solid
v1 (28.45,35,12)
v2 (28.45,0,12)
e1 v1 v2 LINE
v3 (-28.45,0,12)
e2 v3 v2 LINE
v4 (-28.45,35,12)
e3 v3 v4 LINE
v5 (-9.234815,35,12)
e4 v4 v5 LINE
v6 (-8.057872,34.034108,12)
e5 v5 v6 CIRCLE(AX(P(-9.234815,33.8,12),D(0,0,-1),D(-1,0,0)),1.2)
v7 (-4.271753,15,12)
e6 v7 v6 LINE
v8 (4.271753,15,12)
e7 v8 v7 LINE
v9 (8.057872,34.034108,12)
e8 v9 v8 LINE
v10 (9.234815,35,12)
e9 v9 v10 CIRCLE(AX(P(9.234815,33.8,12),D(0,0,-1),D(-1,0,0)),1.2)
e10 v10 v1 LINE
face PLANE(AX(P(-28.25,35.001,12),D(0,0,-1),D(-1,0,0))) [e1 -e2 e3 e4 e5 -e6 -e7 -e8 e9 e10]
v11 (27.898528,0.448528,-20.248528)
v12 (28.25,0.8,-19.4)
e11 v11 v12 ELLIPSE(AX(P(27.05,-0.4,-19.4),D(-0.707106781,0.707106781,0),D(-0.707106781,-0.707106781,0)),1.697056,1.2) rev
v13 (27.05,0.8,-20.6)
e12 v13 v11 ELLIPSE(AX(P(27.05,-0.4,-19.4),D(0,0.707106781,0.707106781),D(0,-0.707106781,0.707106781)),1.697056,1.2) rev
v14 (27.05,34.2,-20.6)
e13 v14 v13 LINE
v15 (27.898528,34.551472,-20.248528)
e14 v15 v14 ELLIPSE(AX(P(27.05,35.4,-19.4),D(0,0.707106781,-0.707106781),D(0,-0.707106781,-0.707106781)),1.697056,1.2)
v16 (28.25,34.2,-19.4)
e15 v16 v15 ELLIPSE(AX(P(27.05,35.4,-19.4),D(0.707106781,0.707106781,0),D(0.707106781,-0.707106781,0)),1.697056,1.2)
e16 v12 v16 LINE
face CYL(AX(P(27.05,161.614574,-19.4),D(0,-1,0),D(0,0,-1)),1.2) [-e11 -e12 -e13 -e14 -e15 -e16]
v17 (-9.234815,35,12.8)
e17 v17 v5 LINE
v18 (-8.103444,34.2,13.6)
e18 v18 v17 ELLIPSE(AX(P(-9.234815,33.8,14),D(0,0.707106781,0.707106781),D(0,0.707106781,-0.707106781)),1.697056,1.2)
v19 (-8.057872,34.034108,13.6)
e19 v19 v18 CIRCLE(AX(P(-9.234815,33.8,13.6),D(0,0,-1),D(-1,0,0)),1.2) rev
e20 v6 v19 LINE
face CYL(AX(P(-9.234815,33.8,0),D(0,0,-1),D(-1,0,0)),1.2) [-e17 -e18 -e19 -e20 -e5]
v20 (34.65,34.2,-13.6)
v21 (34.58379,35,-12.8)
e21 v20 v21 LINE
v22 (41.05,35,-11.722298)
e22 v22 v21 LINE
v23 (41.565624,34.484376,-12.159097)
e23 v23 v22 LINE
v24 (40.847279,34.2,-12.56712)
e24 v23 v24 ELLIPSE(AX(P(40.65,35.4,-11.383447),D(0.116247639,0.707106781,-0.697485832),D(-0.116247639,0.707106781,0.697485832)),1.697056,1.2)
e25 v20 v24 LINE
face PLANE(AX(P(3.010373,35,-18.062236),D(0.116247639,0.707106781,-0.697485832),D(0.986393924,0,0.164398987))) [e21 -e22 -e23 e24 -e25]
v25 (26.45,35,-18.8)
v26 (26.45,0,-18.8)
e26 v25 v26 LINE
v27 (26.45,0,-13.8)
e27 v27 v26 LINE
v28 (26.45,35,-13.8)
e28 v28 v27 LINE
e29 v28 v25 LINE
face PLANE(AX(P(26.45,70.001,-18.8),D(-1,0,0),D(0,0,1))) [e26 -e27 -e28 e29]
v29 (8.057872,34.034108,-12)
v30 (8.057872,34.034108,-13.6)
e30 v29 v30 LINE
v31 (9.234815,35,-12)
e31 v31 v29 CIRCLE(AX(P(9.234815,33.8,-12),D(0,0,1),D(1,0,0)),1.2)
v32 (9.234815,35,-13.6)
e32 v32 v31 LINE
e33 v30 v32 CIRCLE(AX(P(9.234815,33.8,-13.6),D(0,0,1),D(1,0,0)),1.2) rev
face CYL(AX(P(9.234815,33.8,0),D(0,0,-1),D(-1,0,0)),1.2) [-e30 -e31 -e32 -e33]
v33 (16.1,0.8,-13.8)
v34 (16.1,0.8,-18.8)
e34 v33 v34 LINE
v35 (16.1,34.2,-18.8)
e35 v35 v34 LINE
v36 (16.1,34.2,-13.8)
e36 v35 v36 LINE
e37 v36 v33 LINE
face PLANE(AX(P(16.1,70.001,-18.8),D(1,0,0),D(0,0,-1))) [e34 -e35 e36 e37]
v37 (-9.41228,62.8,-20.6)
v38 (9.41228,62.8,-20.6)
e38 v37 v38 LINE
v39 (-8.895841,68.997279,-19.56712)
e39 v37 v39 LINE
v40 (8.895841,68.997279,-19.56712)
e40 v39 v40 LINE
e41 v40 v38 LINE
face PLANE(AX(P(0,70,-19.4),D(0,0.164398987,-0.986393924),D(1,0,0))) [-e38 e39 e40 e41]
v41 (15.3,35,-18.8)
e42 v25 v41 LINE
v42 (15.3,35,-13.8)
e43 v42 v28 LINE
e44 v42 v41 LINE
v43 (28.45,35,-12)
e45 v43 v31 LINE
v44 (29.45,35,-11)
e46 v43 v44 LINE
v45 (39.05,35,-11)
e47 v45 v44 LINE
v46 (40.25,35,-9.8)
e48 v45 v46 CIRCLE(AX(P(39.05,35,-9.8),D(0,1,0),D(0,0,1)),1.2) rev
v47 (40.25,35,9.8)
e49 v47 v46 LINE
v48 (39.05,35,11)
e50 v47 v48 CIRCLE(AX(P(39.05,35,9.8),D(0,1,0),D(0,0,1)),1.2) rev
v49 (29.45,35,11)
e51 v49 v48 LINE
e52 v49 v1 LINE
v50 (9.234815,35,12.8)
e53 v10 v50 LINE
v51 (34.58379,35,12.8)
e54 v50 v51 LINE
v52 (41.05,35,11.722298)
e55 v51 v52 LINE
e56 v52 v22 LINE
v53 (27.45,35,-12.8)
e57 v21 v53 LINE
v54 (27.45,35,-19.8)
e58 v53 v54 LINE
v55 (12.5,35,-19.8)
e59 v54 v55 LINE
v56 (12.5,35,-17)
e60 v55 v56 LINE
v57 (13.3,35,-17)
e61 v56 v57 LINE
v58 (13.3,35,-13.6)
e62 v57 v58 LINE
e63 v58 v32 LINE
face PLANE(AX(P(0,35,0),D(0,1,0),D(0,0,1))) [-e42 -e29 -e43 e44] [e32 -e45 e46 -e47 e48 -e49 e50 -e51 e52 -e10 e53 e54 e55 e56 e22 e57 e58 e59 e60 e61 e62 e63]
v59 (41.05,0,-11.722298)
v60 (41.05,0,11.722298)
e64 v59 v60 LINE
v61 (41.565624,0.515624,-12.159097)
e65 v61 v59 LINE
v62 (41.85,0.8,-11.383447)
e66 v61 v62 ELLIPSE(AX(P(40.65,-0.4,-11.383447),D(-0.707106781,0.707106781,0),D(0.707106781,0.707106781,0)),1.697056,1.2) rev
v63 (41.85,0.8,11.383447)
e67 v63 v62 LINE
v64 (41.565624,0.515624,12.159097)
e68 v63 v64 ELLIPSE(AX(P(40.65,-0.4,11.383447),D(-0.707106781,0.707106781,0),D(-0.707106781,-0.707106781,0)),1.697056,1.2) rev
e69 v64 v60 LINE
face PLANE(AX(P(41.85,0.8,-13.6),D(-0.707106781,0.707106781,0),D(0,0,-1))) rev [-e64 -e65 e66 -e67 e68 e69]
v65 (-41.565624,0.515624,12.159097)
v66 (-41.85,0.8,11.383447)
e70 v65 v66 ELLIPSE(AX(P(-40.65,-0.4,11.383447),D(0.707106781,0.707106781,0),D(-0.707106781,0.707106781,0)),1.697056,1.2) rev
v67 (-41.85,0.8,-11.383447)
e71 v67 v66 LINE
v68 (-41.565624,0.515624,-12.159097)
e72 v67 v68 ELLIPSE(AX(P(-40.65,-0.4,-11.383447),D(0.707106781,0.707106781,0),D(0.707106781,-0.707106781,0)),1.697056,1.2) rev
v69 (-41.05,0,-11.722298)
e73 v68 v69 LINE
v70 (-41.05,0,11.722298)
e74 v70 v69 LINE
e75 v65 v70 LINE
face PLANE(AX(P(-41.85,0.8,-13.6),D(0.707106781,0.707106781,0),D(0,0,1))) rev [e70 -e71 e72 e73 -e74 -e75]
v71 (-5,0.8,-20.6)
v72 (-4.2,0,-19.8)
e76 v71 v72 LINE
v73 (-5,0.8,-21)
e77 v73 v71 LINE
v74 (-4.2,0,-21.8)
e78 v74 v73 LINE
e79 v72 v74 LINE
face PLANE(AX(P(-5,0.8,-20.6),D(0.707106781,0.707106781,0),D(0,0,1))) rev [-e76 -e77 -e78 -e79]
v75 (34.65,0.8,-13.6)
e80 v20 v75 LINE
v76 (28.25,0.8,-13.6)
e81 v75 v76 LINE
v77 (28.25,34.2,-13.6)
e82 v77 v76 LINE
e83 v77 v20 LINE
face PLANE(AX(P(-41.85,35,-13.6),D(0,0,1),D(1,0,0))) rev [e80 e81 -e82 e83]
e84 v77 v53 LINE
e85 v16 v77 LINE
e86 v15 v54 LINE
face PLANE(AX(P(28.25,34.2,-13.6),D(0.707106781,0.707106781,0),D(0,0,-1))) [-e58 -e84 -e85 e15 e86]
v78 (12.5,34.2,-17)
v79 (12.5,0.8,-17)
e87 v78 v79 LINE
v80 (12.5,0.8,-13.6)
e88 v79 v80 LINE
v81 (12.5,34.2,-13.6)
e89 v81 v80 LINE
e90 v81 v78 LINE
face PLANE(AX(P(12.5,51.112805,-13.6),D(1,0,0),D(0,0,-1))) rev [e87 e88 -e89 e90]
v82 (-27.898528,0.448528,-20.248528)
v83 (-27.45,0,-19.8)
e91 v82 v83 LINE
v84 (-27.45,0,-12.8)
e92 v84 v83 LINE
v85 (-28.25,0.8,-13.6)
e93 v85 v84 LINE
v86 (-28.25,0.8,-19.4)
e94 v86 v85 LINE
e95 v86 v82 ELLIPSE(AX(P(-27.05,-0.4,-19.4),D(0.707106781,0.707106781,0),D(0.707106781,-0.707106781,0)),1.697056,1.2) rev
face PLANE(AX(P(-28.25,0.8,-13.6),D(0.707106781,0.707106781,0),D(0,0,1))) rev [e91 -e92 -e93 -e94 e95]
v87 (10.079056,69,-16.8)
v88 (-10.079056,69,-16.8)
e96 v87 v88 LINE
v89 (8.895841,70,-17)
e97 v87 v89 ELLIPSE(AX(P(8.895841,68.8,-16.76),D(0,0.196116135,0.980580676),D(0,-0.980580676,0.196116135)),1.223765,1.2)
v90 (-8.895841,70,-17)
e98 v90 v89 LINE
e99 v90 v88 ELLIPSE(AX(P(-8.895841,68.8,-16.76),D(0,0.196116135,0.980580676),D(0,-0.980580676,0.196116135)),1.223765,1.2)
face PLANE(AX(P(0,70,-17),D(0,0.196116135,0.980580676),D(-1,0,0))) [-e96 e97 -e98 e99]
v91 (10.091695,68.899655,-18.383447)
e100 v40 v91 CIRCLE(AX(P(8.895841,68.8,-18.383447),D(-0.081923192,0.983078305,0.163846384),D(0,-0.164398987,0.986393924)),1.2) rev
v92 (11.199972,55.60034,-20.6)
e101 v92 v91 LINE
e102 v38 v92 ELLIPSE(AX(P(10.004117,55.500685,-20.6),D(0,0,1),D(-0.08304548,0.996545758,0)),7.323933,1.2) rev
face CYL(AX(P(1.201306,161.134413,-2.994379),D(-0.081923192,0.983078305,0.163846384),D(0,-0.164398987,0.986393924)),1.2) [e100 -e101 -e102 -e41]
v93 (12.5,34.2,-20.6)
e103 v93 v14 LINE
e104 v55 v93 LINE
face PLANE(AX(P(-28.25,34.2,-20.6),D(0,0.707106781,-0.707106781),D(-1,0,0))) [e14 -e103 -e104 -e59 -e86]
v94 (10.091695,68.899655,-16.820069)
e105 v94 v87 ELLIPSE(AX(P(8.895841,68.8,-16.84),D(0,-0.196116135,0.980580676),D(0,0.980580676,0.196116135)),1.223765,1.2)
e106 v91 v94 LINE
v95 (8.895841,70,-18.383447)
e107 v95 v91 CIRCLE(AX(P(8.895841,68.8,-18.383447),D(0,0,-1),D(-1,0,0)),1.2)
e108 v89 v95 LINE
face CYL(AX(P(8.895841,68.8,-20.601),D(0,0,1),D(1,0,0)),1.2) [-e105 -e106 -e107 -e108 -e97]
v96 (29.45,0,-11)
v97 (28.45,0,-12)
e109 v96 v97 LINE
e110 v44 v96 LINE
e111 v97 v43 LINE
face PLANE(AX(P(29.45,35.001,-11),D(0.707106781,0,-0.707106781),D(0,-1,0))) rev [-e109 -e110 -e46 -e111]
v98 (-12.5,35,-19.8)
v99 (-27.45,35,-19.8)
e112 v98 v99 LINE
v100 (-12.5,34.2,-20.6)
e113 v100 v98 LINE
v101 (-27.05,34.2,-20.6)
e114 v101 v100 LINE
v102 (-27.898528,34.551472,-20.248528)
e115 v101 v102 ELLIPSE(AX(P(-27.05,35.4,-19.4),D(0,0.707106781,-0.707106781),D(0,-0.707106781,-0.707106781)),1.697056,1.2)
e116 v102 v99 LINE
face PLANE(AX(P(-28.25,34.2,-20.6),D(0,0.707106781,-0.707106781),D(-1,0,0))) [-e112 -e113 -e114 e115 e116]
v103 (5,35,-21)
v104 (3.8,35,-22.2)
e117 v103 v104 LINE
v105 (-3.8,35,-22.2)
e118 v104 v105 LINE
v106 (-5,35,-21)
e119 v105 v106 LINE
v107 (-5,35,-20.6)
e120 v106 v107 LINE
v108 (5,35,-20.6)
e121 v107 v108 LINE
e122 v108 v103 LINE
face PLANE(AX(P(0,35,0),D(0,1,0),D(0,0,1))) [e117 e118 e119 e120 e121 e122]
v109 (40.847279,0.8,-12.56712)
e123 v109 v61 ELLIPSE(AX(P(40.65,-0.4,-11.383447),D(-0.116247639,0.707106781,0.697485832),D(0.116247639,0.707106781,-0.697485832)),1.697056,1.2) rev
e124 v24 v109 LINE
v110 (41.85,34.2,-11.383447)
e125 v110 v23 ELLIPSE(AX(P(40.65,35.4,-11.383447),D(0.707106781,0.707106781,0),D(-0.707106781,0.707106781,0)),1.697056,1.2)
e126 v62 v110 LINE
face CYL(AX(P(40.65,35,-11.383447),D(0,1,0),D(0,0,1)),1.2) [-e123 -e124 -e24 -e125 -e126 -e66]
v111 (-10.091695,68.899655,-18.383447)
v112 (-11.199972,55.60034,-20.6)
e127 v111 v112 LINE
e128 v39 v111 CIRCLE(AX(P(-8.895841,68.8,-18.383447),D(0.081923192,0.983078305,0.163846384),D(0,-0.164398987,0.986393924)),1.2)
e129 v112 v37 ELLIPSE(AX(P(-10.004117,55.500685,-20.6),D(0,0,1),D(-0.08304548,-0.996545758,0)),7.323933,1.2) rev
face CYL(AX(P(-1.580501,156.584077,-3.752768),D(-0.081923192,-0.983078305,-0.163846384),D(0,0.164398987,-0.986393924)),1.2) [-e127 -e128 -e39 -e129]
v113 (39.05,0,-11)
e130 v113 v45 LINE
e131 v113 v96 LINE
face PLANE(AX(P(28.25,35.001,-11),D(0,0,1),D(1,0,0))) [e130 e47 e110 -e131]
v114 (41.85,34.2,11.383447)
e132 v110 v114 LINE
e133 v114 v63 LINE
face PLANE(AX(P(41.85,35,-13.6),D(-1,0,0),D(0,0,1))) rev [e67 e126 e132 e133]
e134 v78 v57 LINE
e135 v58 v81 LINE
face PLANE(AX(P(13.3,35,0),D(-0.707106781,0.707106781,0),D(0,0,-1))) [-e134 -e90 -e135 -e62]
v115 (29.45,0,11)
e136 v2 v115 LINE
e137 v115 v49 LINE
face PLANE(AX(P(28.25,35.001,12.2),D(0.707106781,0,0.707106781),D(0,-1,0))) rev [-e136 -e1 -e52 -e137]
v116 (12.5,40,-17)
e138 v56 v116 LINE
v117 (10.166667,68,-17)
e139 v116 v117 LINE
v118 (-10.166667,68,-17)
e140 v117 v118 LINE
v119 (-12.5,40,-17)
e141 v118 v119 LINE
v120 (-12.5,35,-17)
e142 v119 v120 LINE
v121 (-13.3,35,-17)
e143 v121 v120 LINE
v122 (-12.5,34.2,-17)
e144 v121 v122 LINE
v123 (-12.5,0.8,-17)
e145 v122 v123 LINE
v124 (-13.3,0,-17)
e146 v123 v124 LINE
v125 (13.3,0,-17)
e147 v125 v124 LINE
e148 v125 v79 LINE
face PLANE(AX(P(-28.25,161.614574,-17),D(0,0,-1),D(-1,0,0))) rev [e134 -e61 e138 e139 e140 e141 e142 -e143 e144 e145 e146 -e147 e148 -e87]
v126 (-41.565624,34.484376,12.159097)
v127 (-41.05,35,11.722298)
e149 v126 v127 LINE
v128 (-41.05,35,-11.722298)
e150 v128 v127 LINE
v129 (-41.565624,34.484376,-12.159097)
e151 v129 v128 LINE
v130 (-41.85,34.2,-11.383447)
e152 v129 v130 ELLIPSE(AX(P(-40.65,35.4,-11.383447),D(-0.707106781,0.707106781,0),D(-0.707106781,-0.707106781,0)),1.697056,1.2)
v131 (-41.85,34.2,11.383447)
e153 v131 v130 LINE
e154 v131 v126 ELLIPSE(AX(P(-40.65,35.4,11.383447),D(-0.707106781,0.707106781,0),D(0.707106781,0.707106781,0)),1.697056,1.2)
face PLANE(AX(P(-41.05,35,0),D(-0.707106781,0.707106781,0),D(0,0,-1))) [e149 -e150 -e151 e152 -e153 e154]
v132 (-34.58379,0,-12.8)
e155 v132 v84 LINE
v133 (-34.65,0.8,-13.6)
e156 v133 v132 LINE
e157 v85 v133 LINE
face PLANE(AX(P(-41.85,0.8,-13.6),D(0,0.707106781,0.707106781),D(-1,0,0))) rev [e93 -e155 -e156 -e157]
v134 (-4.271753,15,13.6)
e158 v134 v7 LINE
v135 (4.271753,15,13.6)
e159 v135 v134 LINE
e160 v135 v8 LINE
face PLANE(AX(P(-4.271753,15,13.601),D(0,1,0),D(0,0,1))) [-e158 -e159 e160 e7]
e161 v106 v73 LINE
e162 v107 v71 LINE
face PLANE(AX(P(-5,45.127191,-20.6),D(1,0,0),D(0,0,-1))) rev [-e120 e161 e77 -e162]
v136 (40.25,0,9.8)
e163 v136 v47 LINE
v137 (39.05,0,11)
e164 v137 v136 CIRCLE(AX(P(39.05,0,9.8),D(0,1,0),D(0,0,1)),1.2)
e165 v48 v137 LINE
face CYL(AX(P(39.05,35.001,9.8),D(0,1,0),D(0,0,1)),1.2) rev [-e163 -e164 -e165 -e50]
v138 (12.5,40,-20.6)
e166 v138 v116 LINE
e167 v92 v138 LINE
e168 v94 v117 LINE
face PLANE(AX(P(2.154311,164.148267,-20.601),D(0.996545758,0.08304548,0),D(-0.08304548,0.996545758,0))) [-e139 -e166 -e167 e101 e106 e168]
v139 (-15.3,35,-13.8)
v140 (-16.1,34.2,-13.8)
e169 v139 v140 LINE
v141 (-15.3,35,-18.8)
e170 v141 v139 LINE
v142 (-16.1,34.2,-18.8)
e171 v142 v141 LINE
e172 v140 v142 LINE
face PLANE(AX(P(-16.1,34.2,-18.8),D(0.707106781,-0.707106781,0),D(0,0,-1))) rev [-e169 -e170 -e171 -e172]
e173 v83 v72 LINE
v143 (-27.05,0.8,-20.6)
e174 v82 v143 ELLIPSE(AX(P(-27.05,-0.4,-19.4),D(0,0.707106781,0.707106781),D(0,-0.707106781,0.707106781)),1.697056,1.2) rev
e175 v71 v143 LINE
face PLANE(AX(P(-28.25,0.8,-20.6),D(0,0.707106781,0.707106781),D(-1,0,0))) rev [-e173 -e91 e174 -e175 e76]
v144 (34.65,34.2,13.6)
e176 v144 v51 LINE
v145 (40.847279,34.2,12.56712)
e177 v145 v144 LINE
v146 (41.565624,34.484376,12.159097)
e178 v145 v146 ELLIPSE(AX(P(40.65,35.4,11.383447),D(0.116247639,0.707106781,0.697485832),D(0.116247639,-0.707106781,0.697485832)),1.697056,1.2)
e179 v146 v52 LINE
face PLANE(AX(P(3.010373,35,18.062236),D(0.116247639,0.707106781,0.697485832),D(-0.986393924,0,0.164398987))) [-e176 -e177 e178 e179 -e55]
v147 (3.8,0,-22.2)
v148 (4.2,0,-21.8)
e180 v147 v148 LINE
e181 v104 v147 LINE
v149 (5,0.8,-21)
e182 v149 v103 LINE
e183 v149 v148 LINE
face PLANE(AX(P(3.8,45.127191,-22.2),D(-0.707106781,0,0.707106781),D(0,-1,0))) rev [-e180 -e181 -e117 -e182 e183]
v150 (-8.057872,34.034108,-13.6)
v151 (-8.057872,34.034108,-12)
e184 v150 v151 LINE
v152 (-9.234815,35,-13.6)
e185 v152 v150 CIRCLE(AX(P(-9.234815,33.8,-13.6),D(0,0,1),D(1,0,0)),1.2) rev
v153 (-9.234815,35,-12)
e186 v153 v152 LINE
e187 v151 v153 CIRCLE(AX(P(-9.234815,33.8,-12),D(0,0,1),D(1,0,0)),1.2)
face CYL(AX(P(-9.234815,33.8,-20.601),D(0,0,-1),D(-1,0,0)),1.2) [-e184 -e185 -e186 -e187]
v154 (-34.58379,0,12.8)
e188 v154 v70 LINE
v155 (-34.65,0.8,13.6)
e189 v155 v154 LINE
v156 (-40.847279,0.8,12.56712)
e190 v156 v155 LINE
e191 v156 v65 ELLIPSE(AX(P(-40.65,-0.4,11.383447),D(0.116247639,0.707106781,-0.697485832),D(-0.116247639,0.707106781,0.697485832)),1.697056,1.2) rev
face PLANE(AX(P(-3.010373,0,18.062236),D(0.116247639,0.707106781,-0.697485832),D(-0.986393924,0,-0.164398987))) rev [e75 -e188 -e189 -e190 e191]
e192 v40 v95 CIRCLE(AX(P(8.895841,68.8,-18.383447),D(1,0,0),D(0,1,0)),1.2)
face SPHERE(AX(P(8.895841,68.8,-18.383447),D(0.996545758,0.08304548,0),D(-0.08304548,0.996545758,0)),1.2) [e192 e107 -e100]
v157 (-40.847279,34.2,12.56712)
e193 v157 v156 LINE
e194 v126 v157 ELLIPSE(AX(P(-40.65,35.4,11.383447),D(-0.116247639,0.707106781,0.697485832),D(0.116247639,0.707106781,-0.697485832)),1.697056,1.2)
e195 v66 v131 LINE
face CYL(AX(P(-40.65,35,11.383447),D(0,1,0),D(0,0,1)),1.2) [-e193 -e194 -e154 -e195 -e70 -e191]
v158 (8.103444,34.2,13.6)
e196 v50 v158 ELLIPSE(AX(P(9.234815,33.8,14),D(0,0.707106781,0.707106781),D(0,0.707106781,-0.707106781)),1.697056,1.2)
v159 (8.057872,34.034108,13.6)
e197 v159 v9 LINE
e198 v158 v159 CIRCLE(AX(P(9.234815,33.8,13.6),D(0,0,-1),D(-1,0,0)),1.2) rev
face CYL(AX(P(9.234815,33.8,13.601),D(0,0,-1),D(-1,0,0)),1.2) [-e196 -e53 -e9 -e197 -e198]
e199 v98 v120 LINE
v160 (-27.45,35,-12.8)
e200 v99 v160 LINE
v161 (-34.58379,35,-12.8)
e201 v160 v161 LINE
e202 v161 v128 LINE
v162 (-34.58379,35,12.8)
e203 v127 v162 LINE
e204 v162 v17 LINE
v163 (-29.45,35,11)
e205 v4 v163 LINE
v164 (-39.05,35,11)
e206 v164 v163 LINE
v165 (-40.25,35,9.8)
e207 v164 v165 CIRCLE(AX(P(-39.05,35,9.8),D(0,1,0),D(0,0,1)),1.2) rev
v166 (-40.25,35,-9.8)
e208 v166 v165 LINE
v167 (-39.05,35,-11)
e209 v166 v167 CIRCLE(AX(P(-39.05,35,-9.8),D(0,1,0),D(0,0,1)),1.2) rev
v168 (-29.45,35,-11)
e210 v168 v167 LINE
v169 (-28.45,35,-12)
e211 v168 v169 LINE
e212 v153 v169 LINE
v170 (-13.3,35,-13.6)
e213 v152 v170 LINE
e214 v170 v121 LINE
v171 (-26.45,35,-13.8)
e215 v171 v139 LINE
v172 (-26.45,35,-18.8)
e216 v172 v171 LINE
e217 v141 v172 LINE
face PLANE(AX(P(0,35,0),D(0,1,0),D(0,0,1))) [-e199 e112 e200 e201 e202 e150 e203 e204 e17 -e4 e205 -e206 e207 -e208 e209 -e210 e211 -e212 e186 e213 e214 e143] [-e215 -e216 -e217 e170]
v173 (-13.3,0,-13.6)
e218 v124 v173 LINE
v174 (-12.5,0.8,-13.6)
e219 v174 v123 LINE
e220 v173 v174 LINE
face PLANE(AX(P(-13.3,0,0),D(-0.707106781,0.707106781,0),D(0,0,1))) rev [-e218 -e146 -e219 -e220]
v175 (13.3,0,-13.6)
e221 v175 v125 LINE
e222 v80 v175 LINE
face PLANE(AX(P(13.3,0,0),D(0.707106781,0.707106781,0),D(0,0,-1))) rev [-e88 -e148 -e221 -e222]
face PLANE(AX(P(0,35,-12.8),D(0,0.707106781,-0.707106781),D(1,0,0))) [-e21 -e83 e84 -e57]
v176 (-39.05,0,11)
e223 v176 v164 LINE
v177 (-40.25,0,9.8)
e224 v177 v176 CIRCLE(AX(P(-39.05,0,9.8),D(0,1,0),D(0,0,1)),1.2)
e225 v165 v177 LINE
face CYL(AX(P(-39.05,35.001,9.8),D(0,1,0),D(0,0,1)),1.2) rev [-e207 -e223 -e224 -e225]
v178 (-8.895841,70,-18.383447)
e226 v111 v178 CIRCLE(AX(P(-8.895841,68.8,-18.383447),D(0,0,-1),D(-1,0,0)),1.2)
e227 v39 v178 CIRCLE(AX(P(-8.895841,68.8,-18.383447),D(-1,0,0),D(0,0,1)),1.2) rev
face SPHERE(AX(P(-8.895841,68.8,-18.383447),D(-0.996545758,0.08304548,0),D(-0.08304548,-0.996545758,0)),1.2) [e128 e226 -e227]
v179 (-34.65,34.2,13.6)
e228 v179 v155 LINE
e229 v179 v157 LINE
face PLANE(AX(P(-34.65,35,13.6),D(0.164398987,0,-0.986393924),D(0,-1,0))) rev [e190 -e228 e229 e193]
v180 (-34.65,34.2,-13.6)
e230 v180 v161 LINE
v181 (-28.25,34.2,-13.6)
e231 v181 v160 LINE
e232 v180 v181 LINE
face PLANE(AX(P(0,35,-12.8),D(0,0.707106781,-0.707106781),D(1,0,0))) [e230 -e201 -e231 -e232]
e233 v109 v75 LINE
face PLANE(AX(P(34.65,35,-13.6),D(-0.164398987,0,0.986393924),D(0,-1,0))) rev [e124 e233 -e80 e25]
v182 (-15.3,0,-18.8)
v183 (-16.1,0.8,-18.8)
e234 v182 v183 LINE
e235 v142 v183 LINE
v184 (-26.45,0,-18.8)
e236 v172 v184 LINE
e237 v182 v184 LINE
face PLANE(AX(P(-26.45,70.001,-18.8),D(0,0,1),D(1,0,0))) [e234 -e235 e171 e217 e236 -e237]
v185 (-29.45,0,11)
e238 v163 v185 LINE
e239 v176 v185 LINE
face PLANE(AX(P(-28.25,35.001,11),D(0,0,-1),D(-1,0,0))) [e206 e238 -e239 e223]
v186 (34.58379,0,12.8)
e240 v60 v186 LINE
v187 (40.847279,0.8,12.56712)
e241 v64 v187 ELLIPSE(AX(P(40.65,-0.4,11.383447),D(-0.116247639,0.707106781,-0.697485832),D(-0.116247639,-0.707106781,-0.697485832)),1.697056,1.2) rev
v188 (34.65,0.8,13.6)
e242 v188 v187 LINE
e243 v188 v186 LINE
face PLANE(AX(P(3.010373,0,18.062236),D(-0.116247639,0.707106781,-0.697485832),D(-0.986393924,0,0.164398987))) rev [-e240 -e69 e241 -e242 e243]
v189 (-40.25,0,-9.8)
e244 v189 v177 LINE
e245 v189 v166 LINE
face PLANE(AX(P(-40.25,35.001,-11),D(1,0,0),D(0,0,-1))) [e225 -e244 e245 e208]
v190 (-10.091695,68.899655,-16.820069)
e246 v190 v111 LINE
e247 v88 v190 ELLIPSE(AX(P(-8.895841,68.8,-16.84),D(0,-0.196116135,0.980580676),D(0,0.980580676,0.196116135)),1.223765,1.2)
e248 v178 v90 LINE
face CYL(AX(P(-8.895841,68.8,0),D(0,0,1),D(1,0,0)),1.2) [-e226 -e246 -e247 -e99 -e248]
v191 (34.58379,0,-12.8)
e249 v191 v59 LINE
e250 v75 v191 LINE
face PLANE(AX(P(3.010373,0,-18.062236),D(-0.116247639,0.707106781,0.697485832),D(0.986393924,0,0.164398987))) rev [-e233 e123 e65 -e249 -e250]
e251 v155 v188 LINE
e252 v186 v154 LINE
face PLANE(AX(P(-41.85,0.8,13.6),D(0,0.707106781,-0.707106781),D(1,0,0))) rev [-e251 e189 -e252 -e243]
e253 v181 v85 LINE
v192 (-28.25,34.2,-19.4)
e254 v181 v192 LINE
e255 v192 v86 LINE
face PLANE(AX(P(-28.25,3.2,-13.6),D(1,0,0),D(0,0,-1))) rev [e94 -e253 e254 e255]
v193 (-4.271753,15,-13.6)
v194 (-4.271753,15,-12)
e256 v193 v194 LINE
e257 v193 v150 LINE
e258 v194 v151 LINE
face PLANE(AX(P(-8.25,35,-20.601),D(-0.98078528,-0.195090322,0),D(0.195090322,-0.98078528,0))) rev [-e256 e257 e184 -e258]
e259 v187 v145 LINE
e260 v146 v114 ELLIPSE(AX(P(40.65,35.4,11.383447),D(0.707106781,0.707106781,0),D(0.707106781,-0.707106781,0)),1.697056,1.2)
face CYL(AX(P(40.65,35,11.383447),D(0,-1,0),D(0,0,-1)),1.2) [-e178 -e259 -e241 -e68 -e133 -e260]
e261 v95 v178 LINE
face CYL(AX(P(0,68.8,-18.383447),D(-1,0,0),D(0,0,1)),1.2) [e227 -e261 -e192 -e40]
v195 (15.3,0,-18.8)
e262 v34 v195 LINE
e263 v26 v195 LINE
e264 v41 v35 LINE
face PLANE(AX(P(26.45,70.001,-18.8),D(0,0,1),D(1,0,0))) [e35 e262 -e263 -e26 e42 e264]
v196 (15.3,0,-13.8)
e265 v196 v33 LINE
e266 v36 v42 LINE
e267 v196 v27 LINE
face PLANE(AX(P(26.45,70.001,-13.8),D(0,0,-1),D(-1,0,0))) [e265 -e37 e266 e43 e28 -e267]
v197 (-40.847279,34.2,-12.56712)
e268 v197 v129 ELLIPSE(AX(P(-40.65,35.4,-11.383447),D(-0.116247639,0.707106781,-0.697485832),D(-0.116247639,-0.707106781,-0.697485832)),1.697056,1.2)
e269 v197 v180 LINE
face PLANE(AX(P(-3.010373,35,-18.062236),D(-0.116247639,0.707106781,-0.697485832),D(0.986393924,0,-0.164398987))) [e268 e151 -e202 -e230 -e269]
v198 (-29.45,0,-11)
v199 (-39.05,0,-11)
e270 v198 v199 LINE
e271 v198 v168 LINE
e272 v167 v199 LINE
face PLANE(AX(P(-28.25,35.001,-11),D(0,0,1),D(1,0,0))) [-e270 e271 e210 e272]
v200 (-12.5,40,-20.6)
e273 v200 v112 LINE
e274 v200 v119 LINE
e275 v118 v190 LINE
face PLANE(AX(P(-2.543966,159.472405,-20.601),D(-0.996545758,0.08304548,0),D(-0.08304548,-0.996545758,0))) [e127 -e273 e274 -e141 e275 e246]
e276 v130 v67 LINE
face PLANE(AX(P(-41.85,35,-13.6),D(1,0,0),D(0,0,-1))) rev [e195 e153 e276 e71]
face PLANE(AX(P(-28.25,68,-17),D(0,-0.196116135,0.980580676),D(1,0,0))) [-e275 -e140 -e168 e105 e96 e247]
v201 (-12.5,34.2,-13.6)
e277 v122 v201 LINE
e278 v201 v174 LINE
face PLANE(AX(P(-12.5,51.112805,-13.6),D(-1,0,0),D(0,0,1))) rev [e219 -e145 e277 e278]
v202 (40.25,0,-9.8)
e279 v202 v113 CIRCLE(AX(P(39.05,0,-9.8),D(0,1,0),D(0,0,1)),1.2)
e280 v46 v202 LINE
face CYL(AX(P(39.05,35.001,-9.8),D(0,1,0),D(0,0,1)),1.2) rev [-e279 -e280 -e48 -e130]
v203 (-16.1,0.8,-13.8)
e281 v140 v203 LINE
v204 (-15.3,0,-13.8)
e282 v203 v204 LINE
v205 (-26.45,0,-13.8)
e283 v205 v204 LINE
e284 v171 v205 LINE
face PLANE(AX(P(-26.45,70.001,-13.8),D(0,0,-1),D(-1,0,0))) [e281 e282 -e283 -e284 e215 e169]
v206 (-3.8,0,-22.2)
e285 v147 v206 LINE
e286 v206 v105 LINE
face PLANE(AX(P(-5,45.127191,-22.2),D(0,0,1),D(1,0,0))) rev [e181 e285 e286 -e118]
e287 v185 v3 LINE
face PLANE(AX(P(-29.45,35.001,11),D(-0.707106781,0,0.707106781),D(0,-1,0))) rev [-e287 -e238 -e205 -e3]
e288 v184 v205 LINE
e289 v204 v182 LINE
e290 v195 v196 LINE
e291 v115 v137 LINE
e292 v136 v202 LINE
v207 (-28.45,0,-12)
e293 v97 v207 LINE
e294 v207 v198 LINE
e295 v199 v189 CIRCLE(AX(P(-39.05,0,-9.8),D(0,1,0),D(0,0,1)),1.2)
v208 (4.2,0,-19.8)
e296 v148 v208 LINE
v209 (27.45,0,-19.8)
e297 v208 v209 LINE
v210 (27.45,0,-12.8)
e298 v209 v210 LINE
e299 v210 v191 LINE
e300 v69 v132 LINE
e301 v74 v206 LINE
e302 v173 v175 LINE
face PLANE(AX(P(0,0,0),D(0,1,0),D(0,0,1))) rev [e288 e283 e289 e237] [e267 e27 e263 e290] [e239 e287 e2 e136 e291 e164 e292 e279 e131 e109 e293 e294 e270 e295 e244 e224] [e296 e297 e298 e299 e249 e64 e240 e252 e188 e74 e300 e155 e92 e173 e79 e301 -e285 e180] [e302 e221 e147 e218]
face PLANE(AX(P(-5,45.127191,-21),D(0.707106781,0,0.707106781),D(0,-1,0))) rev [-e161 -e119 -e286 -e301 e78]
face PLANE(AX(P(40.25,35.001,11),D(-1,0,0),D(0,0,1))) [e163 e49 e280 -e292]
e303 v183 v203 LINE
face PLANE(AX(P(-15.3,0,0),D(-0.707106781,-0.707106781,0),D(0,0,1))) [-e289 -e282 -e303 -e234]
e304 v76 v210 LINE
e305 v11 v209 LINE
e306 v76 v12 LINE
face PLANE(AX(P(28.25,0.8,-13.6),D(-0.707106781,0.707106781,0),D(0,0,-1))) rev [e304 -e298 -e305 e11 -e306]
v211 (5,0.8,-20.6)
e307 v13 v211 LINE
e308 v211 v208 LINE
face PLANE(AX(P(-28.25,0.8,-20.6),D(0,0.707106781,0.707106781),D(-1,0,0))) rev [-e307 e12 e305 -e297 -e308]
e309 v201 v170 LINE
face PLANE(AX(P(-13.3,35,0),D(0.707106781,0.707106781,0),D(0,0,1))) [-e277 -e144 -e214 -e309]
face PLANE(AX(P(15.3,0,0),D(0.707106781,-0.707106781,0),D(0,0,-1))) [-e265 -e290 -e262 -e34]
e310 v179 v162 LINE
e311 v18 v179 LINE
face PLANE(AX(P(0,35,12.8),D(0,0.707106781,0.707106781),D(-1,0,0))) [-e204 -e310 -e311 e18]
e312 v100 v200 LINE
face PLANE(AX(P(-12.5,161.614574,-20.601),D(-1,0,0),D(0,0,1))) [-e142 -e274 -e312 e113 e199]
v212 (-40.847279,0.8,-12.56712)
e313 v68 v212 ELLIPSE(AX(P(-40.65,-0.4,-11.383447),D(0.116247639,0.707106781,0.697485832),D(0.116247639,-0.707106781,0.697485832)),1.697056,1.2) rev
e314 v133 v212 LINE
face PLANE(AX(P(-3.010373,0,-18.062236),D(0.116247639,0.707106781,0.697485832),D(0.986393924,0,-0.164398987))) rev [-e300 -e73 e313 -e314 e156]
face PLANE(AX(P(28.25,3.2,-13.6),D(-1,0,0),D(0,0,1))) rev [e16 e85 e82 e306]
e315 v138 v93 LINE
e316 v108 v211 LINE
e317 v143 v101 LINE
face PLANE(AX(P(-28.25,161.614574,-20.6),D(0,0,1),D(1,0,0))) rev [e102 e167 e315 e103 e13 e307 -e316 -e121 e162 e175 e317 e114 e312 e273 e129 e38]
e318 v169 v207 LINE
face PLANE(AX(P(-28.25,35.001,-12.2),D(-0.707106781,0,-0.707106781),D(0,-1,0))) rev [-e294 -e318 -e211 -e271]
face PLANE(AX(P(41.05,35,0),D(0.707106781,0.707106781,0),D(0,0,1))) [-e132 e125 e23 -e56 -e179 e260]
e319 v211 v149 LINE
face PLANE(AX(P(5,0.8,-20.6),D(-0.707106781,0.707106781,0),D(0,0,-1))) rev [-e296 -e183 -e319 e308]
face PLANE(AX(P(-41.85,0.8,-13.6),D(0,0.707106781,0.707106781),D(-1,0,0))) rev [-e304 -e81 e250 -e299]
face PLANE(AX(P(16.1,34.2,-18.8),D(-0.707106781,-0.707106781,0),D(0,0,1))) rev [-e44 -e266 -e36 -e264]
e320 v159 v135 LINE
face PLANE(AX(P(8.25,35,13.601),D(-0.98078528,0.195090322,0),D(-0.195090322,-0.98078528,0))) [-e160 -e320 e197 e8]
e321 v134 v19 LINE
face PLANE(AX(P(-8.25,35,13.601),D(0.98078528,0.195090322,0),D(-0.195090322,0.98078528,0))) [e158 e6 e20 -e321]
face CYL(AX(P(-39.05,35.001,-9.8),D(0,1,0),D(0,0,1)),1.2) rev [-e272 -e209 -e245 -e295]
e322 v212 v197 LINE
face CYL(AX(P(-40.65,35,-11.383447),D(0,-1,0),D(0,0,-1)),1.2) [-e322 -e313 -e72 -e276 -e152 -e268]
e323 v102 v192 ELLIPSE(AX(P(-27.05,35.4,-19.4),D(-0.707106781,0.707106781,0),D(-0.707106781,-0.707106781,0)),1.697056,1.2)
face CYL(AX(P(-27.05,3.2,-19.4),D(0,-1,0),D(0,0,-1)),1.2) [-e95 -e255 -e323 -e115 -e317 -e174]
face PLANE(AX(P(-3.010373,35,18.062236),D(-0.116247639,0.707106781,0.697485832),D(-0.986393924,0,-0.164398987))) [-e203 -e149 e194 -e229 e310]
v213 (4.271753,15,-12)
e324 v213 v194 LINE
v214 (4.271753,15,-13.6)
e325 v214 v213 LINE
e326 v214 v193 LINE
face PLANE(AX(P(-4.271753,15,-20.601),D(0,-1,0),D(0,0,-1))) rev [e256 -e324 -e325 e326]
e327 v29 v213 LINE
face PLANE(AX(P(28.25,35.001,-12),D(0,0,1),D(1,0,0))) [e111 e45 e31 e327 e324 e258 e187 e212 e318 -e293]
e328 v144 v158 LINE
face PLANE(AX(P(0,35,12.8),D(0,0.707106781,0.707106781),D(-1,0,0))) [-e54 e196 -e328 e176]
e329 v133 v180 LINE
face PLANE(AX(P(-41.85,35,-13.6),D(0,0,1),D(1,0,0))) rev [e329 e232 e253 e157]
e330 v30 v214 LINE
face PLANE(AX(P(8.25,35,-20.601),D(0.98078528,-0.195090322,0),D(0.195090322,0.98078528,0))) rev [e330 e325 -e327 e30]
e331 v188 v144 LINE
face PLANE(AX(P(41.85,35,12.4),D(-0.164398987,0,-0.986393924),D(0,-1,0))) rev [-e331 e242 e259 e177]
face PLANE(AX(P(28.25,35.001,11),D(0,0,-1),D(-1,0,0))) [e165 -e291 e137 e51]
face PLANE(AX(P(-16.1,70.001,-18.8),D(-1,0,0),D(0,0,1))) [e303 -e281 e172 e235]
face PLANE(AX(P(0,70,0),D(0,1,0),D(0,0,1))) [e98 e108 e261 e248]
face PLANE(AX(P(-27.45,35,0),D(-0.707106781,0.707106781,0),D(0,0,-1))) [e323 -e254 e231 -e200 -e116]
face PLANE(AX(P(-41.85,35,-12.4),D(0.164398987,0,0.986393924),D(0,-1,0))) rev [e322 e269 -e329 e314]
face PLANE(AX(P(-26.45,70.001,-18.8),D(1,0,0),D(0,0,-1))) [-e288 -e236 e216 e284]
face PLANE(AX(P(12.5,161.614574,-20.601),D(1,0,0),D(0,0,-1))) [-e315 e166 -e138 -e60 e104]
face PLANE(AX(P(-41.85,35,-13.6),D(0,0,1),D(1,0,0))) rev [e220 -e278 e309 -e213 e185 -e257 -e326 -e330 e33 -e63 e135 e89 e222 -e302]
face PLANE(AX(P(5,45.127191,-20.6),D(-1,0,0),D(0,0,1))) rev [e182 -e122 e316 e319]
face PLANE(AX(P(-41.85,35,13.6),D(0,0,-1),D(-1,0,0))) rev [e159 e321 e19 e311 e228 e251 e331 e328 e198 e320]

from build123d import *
from OCP.BRepFilletAPI import BRepFilletAPI_MakeChamfer

# Parameters (mm, degrees)
SKETCH1_W                      = 83.7
SKETCH1_H                      = 27.2
BOSS_EXTRUDE1_DEPTH            = 35
CUT_EXTRUDE1_REACH             = 58.226
SKETCH3_W                      = 56.5
SKETCH3_H                      = 3.4
BOSS_EXTRUDE2_DEPTH            = 3.2
SKETCH4_W                      = 56.5
SKETCH4_H                      = 3.6
BOSS_EXTRUDE3_DEPTH            = 70
CUT_EXTRUDE2_START             = -20.6
SKETCH5_W                      = 15.75
SKETCH5_H                      = 35
CUT_EXTRUDE2_DEPTH             = 3.6
SKETCH6_W                      = 15.75
SKETCH6_H                      = 3.4
BOSS_EXTRUDE4_DEPTH            = 35
CUT_EXTRUDE3_REACH             = 86.118
SKETCH7_W                      = 25
SKETCH7_H                      = 3.4
CUT_EXTRUDE4_START             = -20.6
CUT_EXTRUDE4_DEPTH             = 3.6
CUT_EXTRUDE5_REACH             = 86.118
SKETCH9_W                      = 10.35
SKETCH9_H                      = 5
CUT_EXTRUDE6_REACH             = 86.118
CUT_EXTRUDE6_DIRECTION_2_REACH = 86.118
SKETCH11_W                     = 10
SKETCH11_H                     = 1.6
BOSS_EXTRUDE5_DEPTH            = 35
BOSS_EXTRUDE6_START            = -17
BOSS_EXTRUDE6_DEPTH            = 0.2
CHAMFER1_SIZE                  = 7.2
CHAMFER1_SIZE2                 = 1.2
CHAMFER2_SIZE                  = 1.2
CHAMFER2_SIZE2                 = 7.2
CHAMFER3_SIZE                  = 1.2
CHAMFER4_SIZE                  = 0.8
CHAMFER5_SIZE                  = 0.2
CHAMFER5_SIZE_2                = 1
FILLET1_R                      = 1.2


# Some blends are built 0.0001 mm under size
with BuildPart() as part:
    # Sketch1 → Boss-Extrude1 (new body)
    with BuildSketch(Plane(origin=(0, 0, 0), x_dir=(1, 0, 0), z_dir=(0, 1, 0))):
        Rectangle(SKETCH1_W, SKETCH1_H)
    extrude(amount=BOSS_EXTRUDE1_DEPTH)

    # Sketch2 → Cut-Extrude1 (cut, up to next)
    with BuildSketch(Plane(origin=(0, 0, 0), x_dir=(1, 0, 0), z_dir=(0, 1, 0)), mode=Mode.PRIVATE) as cut_extrude1_sk1:
        Polygon((-28.25, 12), (-28.25, 11), (-40.25, 11), (-40.25, -11), (-28.25, -11), (-28.25, -12), (28.25, -12), (28.25, -11), (40.25, -11), (40.25, 11), (28.25, 11), (28.25, 12), align=None)
    cut_extrude1_tool1 = extrude(cut_extrude1_sk1.sketch, amount=CUT_EXTRUDE1_REACH, mode=Mode.PRIVATE) & part.part
    add(cut_extrude1_tool1.solids().sort_by_distance((0, 0, 0))[0], mode=Mode.SUBTRACT)

    # Sketch3 → Boss-Extrude2 (add)
    with BuildSketch(Plane(origin=(0, 0, 0), x_dir=(1, 0, 0), z_dir=(0, 1, 0))):
        with Locations((0, 15.3)):
            Rectangle(SKETCH3_W, SKETCH3_H)
    extrude(amount=BOSS_EXTRUDE2_DEPTH)

    # Sketch4 → Boss-Extrude3 (add)
    with BuildSketch(Plane(origin=(0, 0, 0), x_dir=(1, 0, 0), z_dir=(0, 1, 0))):
        with Locations((0, 18.8)):
            Rectangle(SKETCH4_W, SKETCH4_H)
    extrude(amount=BOSS_EXTRUDE3_DEPTH)

    # Sketch5 → Cut-Extrude2 (cut)
    with BuildSketch(Plane.XY.offset(CUT_EXTRUDE2_START)):
        with Locations((-20.375, 52.5)):
            Rectangle(SKETCH5_W, SKETCH5_H)
        with Locations((20.375, 52.5)):
            Rectangle(SKETCH5_W, SKETCH5_H)
    extrude(amount=CUT_EXTRUDE2_DEPTH, mode=Mode.SUBTRACT)

    # Sketch6 → Boss-Extrude4 (add)
    with BuildSketch(Plane(origin=(0, 0, 0), x_dir=(1, 0, 0), z_dir=(0, 1, 0))):
        with Locations((-20.375, 15.3)):
            Rectangle(SKETCH6_W, SKETCH6_H)
        with Locations((20.375, 15.3)):
            Rectangle(SKETCH6_W, SKETCH6_H)
    extrude(amount=BOSS_EXTRUDE4_DEPTH)

    # Sketch7 → Cut-Extrude3 (cut, up to next)
    with BuildSketch(Plane(origin=(0, 0, 0), x_dir=(1, 0, 0), z_dir=(0, 1, 0)), mode=Mode.PRIVATE) as cut_extrude3_sk1:
        with Locations((0, 15.3)):
            Rectangle(SKETCH7_W, SKETCH7_H)
    cut_extrude3_tool1 = extrude(cut_extrude3_sk1.sketch, amount=CUT_EXTRUDE3_REACH, mode=Mode.PRIVATE) & part.part
    add(cut_extrude3_tool1.solids().sort_by_distance((0, 0, -15.3))[0], mode=Mode.SUBTRACT)

    # Sketch8 → Cut-Extrude4 (cut)
    with BuildSketch(Plane.XY.offset(CUT_EXTRUDE4_START)):
        Polygon((12.5, 40), (10, 70), (12.5, 70), align=None)
        Polygon((-12.5, 70), (-10, 70), (-12.5, 40), align=None)
    extrude(amount=CUT_EXTRUDE4_DEPTH, mode=Mode.SUBTRACT)

    # Sketch9 → Cut-Extrude5 (cut, up to next)
    with BuildSketch(Plane(origin=(0, 0, 0), x_dir=(1, 0, 0), z_dir=(0, 1, 0)), mode=Mode.PRIVATE) as cut_extrude5_sk1:
        with Locations((-21.275, 16.3)):
            Rectangle(SKETCH9_W, SKETCH9_H)
    cut_extrude5_tool1 = extrude(cut_extrude5_sk1.sketch, amount=CUT_EXTRUDE5_REACH, mode=Mode.PRIVATE) & part.part
    # Sketch9 → Cut-Extrude5 (cut, up to next)
    with BuildSketch(Plane(origin=(0, 0, 0), x_dir=(1, 0, 0), z_dir=(0, 1, 0)), mode=Mode.PRIVATE) as cut_extrude5_sk2:
        with Locations((21.275, 16.3)):
            Rectangle(SKETCH9_W, SKETCH9_H)
    cut_extrude5_tool2 = extrude(cut_extrude5_sk2.sketch, amount=CUT_EXTRUDE5_REACH, mode=Mode.PRIVATE) & part.part
    add(cut_extrude5_tool1.solids().sort_by_distance((-21.275, 0, -16.3))[0], mode=Mode.SUBTRACT)
    add(cut_extrude5_tool2.solids().sort_by_distance((21.275, 0, -16.3))[0], mode=Mode.SUBTRACT)

    # Sketch10 → Cut-Extrude6 (cut, up to next)
    with BuildSketch(Plane.XY, mode=Mode.PRIVATE) as cut_extrude6_sk1:
        Polygon((-8.25, 35), (8.25, 35), (4.271752652, 15), (-4.271752652, 15), align=None)
    cut_extrude6_tool1 = extrude(cut_extrude6_sk1.sketch, amount=-CUT_EXTRUDE6_REACH, mode=Mode.PRIVATE) & part.part
    add(cut_extrude6_tool1.solids().sort_by_distance((0, 26.059023, 0))[0], mode=Mode.SUBTRACT)

    # Sketch10 → Cut-Extrude6 direction 2 (cut, up to next)
    with BuildSketch(Plane.XY, mode=Mode.PRIVATE) as cut_extrude6_direction_2_sk1:
        Polygon((-8.25, 35), (8.25, 35), (4.271752652, 15), (-4.271752652, 15), align=None)
    cut_extrude6_direction_2_tool1 = extrude(cut_extrude6_direction_2_sk1.sketch, amount=CUT_EXTRUDE6_DIRECTION_2_REACH, mode=Mode.PRIVATE) & part.part
    add(cut_extrude6_direction_2_tool1.solids().sort_by_distance((0, 26.059023, 0))[0], mode=Mode.SUBTRACT)

    # Sketch11 → Boss-Extrude5 (add)
    with BuildSketch(Plane(origin=(0, 0, 0), x_dir=(1, 0, 0), z_dir=(0, 1, 0))):
        with Locations((0, 21.4)):
            Rectangle(SKETCH11_W, SKETCH11_H)
    extrude(amount=BOSS_EXTRUDE5_DEPTH)

    # Sketch12 → Boss-Extrude6 (add)
    with BuildSketch(Plane.XY.offset(BOSS_EXTRUDE6_START)):
        Polygon((-10, 70), (-10.166666667, 68), (10.166666667, 68), (10, 70), align=None)
    extrude(amount=BOSS_EXTRUDE6_DEPTH)

    # Chamfer1: one chamfer whose edges measure the first distance from different faces: ONE call of the kernel's chamfer builder (chamfer() names one face for all edges)
    chamfer1_edges_1 = [part.edges().sort_by_distance(p)[0] for p in [
        (0, 70, -20.6),
    ]]
    chamfer1_side_1 = [part.faces().sort_by_distance(p)[0] for p in [
        (16.625, 0.899569341, -20.6),
    ]]
    chamfer1_edges_2 = [part.edges().sort_by_distance(p)[0] for p in [
        (-41.85, 17.5, -13.6),
    ]]
    chamfer1_side_2 = [part.faces().sort_by_distance(p)[0] for p in [
        (-35.05, 17.5, -13.6),
    ]]
    chamfer1_edges_3 = [part.edges().sort_by_distance(p)[0] for p in [
        (41.85, 17.5, 13.6),
    ]]
    chamfer1_side_3 = [part.faces().sort_by_distance(p)[0] for p in [
        (0, 0.907231503, 13.6),
    ]]
    chamfer1 = BRepFilletAPI_MakeChamfer(part.part.solid().wrapped)
    for e in chamfer1_edges_1:
        chamfer1.Add(CHAMFER1_SIZE, CHAMFER1_SIZE2, e.wrapped, chamfer1_side_1[0].wrapped)  # the first distance lies on this face
    for e in chamfer1_edges_2:
        chamfer1.Add(CHAMFER1_SIZE, CHAMFER1_SIZE2, e.wrapped, chamfer1_side_2[0].wrapped)  # the first distance lies on this face
    for e in chamfer1_edges_3:
        chamfer1.Add(CHAMFER1_SIZE, CHAMFER1_SIZE2, e.wrapped, chamfer1_side_3[0].wrapped)  # the first distance lies on this face
    add(Compound.cast(chamfer1.Shape()), mode=Mode.REPLACE)

    # Chamfer2: one chamfer whose edges measure the first distance from different faces: ONE call of the kernel's chamfer builder (chamfer() names one face for all edges)
    chamfer2_edges_1 = [part.edges().sort_by_distance(p)[0] for p in [
        (41.85, 17.5, -13.6),
    ]]
    chamfer2_side_1 = [part.faces().sort_by_distance(p)[0] for p in [
        (41.85, 17.5, -0.6),
    ]]
    chamfer2_edges_2 = [part.edges().sort_by_distance(p)[0] for p in [
        (-41.85, 17.5, 13.6),
    ]]
    chamfer2_side_2 = [part.faces().sort_by_distance(p)[0] for p in [
        (-41.85, 17.5, 0.6),
    ]]
    chamfer2 = BRepFilletAPI_MakeChamfer(part.part.solid().wrapped)
    for e in chamfer2_edges_1:
        chamfer2.Add(CHAMFER2_SIZE, CHAMFER2_SIZE2, e.wrapped, chamfer2_side_1[0].wrapped)  # the first distance lies on this face
    for e in chamfer2_edges_2:
        chamfer2.Add(CHAMFER2_SIZE, CHAMFER2_SIZE2, e.wrapped, chamfer2_side_2[0].wrapped)  # the first distance lies on this face
    add(Compound.cast(chamfer2.Shape()), mode=Mode.REPLACE)

    # Chamfer3
    # the kernel refuses this chamfer: 1.2 mm, written as the material it takes off along each edge
    with BuildSketch(Plane(origin=(28.25, -3.086019586, -11), x_dir=(0.9996219169112968, 0, 0.027495876610585904), z_dir=(0, 1, 0))) as chamfer3_piece_1_section:
        Polygon((CHAMFER3_SIZE * 0.999621916911, CHAMFER3_SIZE * 0.0274958766106), (-CHAMFER3_SIZE * 0.0274958766106, CHAMFER3_SIZE * 0.999621916911), (0, 0), align=None)
    chamfer3_piece_1 = extrude(amount=41.172039171, mode=Mode.PRIVATE)
    chamfer3_piece_1 = split(chamfer3_piece_1, bisect_by=Plane(origin=(28.660431829, 17.5, -12), z_dir=(0, 0, 1)), keep=Keep.TOP, mode=Mode.PRIVATE)
    add(chamfer3_piece_1, mode=Mode.SUBTRACT)
    with BuildSketch(Plane(origin=(28.25, -3.086019586, 11), x_dir=(-0.027495876610587378, 0, 0.9996219169112965), z_dir=(0, 1, 0))) as chamfer3_piece_2_section:
        Polygon((CHAMFER3_SIZE * 0.999621916911, CHAMFER3_SIZE * 0.0274958766106), (-CHAMFER3_SIZE * 0.0274958766106, CHAMFER3_SIZE * 0.999621916911), (0, 0), align=None)
    chamfer3_piece_2 = extrude(amount=41.172039171, mode=Mode.PRIVATE)
    chamfer3_piece_2 = split(chamfer3_piece_2, bisect_by=Plane(origin=(28.660431829, 17.5, 12), z_dir=(0, 0, -1)), keep=Keep.TOP, mode=Mode.PRIVATE)
    add(chamfer3_piece_2, mode=Mode.SUBTRACT)
    with BuildSketch(Plane(origin=(-28.25, -3.086019586, 11), x_dir=(-0.9996219169112968, 0, -0.027495876610585904), z_dir=(0, 1, 0))) as chamfer3_piece_3_section:
        Polygon((CHAMFER3_SIZE * 0.999621916911, CHAMFER3_SIZE * 0.0274958766106), (-CHAMFER3_SIZE * 0.0274958766106, CHAMFER3_SIZE * 0.999621916911), (0, 0), align=None)
    chamfer3_piece_3 = extrude(amount=41.172039171, mode=Mode.PRIVATE)
    chamfer3_piece_3 = split(chamfer3_piece_3, bisect_by=Plane(origin=(-28.660431829, 17.5, 12), z_dir=(0, 0, -1)), keep=Keep.TOP, mode=Mode.PRIVATE)
    add(chamfer3_piece_3, mode=Mode.SUBTRACT)
    with BuildSketch(Plane(origin=(-28.25, -3.086019586, -11), x_dir=(0.027495876610587378, 0, -0.9996219169112965), z_dir=(0, 1, 0))) as chamfer3_piece_4_section:
        Polygon((CHAMFER3_SIZE * 0.999621916911, CHAMFER3_SIZE * 0.0274958766106), (-CHAMFER3_SIZE * 0.0274958766106, CHAMFER3_SIZE * 0.999621916911), (0, 0), align=None)
    chamfer3_piece_4 = extrude(amount=41.172039171, mode=Mode.PRIVATE)
    chamfer3_piece_4 = split(chamfer3_piece_4, bisect_by=Plane(origin=(-28.660431829, 17.5, -12), z_dir=(0, 0, 1)), keep=Keep.TOP, mode=Mode.PRIVATE)
    add(chamfer3_piece_4, mode=Mode.SUBTRACT)
    with BuildSketch(Plane(origin=(-5, -3.086019586, -22.2), x_dir=(-0.027495876610586622, 0, 0.9996219169112968), z_dir=(0, 1, 0)), Plane(origin=(5, -3.086019586, -22.2), x_dir=(-0.9996219169112968, 0, -0.027495876610587354), z_dir=(0, 1, 0))) as chamfer3_piece_5:
        Polygon((CHAMFER3_SIZE * 0.999621916911, CHAMFER3_SIZE * 0.0274958766106), (-CHAMFER3_SIZE * 0.0274958766106, CHAMFER3_SIZE * 0.999621916911), (0, 0), align=None)
    extrude(amount=41.172039171, mode=Mode.SUBTRACT)

    # Chamfer4
    chamfer4_edges = [part.edges().sort_by_distance(p)[0] for p in [
        (-38.25, 0, 13),
        (0, 0, 13.6),
        (38.25, 0, 13),
        (41.85, 0, 0),
        (38.25, 0, -13),
        (31.45, 0, -13.6),
        (28.25, 0, -17.1),
        (16.625, 0, -20.6),
        (5, 0, -20.8),
        (-5, 0, -20.8),
        (-16.625, 0, -20.6),
        (-28.25, 0, -17.1),
        (-31.45, 0, -13.6),
        (-38.25, 0, -13),
        (-41.85, 0, 0),
        (16.1, 0, -16.3),
        (-12.5, 0, -15.3),
        (12.5, 0, -15.3),
        (-16.1, 0, -16.3),
        (-38.25, 35, 13),
        (-21.45, 35, 13.6),
        (21.45, 35, 13.6),
        (38.25, 35, 13),
        (41.85, 35, 0),
        (38.25, 35, -13),
        (31.45, 35, -13.6),
        (28.25, 35, -17.1),
        (-20.375, 35, -20.6),
        (20.375, 35, -20.6),
        (-28.25, 35, -17.1),
        (-31.45, 35, -13.6),
        (-38.25, 35, -13),
        (-41.85, 35, 0),
        (16.1, 35, -16.3),
        (-12.5, 35, -15.3),
        (12.5, 35, -15.3),
        (-16.1, 35, -16.3),
    ]]
    chamfer(chamfer4_edges, length=CHAMFER4_SIZE)

    # Chamfer5
    chamfer5_edges_1 = [part.edges().sort_by_distance(p)[0] for p in [
        (0, 68, -16.8),
    ]]
    chamfer5_side_1 = [part.faces().sort_by_distance(p)[0] for p in [
        (0, 68, -16.804),
    ]]
    chamfer5_edges_2 = [part.edges().sort_by_distance(p)[0] for p in [
        (0, 70, -16.8),
    ]]
    chamfer5_side_2 = [part.faces().sort_by_distance(p)[0] for p in [
        (0, 69.996, -16.8),
    ]]
    chamfer5 = BRepFilletAPI_MakeChamfer(part.part.solid().wrapped)
    for e in chamfer5_edges_1:
        chamfer5.Add(CHAMFER5_SIZE - 0.0001, CHAMFER5_SIZE_2 - 0.0001, e.wrapped, chamfer5_side_1[0].wrapped)
    for e in chamfer5_edges_2:
        chamfer5.Add(CHAMFER5_SIZE_2 - 0.0001, CHAMFER5_SIZE - 0.0001, e.wrapped, chamfer5_side_2[0].wrapped)
    add(Compound.cast(chamfer5.Shape()), mode=Mode.REPLACE)  # a hair under: the kernel refuses the full size

    # Fillet1
    fillet1_edges = [part.edges().sort_by_distance(p)[0] for p in [
        (8.25, 35, -12.8),
        (-8.25, 35, -12.8),
        (-40.25, 17.5, -11),
        (-10, 70, -18.19995),
        (10, 70, -18.19995),
        (0, 70, -19.4),
        (-10.3, 66.4, -20),
        (10.3, 66.4, -20),
        (-40.25, 17.5, 11),
        (40.25, 17.5, 11),
        (40.25, 17.5, -11),
        (-8.25, 35, 12.4),
        (8.25, 35, 12.4),
        (28.25, 17.5, -20.6),
        (-28.25, 17.5, -20.6),
        (41.85, 17.5, -12.4),
        (41.85, 17.5, 12.4),
        (-41.85, 17.5, -12.4),
        (-41.85, 17.5, 12.4),
    ]]
    fillet(fillet1_edges, radius=FILLET1_R)


solid = part.part
